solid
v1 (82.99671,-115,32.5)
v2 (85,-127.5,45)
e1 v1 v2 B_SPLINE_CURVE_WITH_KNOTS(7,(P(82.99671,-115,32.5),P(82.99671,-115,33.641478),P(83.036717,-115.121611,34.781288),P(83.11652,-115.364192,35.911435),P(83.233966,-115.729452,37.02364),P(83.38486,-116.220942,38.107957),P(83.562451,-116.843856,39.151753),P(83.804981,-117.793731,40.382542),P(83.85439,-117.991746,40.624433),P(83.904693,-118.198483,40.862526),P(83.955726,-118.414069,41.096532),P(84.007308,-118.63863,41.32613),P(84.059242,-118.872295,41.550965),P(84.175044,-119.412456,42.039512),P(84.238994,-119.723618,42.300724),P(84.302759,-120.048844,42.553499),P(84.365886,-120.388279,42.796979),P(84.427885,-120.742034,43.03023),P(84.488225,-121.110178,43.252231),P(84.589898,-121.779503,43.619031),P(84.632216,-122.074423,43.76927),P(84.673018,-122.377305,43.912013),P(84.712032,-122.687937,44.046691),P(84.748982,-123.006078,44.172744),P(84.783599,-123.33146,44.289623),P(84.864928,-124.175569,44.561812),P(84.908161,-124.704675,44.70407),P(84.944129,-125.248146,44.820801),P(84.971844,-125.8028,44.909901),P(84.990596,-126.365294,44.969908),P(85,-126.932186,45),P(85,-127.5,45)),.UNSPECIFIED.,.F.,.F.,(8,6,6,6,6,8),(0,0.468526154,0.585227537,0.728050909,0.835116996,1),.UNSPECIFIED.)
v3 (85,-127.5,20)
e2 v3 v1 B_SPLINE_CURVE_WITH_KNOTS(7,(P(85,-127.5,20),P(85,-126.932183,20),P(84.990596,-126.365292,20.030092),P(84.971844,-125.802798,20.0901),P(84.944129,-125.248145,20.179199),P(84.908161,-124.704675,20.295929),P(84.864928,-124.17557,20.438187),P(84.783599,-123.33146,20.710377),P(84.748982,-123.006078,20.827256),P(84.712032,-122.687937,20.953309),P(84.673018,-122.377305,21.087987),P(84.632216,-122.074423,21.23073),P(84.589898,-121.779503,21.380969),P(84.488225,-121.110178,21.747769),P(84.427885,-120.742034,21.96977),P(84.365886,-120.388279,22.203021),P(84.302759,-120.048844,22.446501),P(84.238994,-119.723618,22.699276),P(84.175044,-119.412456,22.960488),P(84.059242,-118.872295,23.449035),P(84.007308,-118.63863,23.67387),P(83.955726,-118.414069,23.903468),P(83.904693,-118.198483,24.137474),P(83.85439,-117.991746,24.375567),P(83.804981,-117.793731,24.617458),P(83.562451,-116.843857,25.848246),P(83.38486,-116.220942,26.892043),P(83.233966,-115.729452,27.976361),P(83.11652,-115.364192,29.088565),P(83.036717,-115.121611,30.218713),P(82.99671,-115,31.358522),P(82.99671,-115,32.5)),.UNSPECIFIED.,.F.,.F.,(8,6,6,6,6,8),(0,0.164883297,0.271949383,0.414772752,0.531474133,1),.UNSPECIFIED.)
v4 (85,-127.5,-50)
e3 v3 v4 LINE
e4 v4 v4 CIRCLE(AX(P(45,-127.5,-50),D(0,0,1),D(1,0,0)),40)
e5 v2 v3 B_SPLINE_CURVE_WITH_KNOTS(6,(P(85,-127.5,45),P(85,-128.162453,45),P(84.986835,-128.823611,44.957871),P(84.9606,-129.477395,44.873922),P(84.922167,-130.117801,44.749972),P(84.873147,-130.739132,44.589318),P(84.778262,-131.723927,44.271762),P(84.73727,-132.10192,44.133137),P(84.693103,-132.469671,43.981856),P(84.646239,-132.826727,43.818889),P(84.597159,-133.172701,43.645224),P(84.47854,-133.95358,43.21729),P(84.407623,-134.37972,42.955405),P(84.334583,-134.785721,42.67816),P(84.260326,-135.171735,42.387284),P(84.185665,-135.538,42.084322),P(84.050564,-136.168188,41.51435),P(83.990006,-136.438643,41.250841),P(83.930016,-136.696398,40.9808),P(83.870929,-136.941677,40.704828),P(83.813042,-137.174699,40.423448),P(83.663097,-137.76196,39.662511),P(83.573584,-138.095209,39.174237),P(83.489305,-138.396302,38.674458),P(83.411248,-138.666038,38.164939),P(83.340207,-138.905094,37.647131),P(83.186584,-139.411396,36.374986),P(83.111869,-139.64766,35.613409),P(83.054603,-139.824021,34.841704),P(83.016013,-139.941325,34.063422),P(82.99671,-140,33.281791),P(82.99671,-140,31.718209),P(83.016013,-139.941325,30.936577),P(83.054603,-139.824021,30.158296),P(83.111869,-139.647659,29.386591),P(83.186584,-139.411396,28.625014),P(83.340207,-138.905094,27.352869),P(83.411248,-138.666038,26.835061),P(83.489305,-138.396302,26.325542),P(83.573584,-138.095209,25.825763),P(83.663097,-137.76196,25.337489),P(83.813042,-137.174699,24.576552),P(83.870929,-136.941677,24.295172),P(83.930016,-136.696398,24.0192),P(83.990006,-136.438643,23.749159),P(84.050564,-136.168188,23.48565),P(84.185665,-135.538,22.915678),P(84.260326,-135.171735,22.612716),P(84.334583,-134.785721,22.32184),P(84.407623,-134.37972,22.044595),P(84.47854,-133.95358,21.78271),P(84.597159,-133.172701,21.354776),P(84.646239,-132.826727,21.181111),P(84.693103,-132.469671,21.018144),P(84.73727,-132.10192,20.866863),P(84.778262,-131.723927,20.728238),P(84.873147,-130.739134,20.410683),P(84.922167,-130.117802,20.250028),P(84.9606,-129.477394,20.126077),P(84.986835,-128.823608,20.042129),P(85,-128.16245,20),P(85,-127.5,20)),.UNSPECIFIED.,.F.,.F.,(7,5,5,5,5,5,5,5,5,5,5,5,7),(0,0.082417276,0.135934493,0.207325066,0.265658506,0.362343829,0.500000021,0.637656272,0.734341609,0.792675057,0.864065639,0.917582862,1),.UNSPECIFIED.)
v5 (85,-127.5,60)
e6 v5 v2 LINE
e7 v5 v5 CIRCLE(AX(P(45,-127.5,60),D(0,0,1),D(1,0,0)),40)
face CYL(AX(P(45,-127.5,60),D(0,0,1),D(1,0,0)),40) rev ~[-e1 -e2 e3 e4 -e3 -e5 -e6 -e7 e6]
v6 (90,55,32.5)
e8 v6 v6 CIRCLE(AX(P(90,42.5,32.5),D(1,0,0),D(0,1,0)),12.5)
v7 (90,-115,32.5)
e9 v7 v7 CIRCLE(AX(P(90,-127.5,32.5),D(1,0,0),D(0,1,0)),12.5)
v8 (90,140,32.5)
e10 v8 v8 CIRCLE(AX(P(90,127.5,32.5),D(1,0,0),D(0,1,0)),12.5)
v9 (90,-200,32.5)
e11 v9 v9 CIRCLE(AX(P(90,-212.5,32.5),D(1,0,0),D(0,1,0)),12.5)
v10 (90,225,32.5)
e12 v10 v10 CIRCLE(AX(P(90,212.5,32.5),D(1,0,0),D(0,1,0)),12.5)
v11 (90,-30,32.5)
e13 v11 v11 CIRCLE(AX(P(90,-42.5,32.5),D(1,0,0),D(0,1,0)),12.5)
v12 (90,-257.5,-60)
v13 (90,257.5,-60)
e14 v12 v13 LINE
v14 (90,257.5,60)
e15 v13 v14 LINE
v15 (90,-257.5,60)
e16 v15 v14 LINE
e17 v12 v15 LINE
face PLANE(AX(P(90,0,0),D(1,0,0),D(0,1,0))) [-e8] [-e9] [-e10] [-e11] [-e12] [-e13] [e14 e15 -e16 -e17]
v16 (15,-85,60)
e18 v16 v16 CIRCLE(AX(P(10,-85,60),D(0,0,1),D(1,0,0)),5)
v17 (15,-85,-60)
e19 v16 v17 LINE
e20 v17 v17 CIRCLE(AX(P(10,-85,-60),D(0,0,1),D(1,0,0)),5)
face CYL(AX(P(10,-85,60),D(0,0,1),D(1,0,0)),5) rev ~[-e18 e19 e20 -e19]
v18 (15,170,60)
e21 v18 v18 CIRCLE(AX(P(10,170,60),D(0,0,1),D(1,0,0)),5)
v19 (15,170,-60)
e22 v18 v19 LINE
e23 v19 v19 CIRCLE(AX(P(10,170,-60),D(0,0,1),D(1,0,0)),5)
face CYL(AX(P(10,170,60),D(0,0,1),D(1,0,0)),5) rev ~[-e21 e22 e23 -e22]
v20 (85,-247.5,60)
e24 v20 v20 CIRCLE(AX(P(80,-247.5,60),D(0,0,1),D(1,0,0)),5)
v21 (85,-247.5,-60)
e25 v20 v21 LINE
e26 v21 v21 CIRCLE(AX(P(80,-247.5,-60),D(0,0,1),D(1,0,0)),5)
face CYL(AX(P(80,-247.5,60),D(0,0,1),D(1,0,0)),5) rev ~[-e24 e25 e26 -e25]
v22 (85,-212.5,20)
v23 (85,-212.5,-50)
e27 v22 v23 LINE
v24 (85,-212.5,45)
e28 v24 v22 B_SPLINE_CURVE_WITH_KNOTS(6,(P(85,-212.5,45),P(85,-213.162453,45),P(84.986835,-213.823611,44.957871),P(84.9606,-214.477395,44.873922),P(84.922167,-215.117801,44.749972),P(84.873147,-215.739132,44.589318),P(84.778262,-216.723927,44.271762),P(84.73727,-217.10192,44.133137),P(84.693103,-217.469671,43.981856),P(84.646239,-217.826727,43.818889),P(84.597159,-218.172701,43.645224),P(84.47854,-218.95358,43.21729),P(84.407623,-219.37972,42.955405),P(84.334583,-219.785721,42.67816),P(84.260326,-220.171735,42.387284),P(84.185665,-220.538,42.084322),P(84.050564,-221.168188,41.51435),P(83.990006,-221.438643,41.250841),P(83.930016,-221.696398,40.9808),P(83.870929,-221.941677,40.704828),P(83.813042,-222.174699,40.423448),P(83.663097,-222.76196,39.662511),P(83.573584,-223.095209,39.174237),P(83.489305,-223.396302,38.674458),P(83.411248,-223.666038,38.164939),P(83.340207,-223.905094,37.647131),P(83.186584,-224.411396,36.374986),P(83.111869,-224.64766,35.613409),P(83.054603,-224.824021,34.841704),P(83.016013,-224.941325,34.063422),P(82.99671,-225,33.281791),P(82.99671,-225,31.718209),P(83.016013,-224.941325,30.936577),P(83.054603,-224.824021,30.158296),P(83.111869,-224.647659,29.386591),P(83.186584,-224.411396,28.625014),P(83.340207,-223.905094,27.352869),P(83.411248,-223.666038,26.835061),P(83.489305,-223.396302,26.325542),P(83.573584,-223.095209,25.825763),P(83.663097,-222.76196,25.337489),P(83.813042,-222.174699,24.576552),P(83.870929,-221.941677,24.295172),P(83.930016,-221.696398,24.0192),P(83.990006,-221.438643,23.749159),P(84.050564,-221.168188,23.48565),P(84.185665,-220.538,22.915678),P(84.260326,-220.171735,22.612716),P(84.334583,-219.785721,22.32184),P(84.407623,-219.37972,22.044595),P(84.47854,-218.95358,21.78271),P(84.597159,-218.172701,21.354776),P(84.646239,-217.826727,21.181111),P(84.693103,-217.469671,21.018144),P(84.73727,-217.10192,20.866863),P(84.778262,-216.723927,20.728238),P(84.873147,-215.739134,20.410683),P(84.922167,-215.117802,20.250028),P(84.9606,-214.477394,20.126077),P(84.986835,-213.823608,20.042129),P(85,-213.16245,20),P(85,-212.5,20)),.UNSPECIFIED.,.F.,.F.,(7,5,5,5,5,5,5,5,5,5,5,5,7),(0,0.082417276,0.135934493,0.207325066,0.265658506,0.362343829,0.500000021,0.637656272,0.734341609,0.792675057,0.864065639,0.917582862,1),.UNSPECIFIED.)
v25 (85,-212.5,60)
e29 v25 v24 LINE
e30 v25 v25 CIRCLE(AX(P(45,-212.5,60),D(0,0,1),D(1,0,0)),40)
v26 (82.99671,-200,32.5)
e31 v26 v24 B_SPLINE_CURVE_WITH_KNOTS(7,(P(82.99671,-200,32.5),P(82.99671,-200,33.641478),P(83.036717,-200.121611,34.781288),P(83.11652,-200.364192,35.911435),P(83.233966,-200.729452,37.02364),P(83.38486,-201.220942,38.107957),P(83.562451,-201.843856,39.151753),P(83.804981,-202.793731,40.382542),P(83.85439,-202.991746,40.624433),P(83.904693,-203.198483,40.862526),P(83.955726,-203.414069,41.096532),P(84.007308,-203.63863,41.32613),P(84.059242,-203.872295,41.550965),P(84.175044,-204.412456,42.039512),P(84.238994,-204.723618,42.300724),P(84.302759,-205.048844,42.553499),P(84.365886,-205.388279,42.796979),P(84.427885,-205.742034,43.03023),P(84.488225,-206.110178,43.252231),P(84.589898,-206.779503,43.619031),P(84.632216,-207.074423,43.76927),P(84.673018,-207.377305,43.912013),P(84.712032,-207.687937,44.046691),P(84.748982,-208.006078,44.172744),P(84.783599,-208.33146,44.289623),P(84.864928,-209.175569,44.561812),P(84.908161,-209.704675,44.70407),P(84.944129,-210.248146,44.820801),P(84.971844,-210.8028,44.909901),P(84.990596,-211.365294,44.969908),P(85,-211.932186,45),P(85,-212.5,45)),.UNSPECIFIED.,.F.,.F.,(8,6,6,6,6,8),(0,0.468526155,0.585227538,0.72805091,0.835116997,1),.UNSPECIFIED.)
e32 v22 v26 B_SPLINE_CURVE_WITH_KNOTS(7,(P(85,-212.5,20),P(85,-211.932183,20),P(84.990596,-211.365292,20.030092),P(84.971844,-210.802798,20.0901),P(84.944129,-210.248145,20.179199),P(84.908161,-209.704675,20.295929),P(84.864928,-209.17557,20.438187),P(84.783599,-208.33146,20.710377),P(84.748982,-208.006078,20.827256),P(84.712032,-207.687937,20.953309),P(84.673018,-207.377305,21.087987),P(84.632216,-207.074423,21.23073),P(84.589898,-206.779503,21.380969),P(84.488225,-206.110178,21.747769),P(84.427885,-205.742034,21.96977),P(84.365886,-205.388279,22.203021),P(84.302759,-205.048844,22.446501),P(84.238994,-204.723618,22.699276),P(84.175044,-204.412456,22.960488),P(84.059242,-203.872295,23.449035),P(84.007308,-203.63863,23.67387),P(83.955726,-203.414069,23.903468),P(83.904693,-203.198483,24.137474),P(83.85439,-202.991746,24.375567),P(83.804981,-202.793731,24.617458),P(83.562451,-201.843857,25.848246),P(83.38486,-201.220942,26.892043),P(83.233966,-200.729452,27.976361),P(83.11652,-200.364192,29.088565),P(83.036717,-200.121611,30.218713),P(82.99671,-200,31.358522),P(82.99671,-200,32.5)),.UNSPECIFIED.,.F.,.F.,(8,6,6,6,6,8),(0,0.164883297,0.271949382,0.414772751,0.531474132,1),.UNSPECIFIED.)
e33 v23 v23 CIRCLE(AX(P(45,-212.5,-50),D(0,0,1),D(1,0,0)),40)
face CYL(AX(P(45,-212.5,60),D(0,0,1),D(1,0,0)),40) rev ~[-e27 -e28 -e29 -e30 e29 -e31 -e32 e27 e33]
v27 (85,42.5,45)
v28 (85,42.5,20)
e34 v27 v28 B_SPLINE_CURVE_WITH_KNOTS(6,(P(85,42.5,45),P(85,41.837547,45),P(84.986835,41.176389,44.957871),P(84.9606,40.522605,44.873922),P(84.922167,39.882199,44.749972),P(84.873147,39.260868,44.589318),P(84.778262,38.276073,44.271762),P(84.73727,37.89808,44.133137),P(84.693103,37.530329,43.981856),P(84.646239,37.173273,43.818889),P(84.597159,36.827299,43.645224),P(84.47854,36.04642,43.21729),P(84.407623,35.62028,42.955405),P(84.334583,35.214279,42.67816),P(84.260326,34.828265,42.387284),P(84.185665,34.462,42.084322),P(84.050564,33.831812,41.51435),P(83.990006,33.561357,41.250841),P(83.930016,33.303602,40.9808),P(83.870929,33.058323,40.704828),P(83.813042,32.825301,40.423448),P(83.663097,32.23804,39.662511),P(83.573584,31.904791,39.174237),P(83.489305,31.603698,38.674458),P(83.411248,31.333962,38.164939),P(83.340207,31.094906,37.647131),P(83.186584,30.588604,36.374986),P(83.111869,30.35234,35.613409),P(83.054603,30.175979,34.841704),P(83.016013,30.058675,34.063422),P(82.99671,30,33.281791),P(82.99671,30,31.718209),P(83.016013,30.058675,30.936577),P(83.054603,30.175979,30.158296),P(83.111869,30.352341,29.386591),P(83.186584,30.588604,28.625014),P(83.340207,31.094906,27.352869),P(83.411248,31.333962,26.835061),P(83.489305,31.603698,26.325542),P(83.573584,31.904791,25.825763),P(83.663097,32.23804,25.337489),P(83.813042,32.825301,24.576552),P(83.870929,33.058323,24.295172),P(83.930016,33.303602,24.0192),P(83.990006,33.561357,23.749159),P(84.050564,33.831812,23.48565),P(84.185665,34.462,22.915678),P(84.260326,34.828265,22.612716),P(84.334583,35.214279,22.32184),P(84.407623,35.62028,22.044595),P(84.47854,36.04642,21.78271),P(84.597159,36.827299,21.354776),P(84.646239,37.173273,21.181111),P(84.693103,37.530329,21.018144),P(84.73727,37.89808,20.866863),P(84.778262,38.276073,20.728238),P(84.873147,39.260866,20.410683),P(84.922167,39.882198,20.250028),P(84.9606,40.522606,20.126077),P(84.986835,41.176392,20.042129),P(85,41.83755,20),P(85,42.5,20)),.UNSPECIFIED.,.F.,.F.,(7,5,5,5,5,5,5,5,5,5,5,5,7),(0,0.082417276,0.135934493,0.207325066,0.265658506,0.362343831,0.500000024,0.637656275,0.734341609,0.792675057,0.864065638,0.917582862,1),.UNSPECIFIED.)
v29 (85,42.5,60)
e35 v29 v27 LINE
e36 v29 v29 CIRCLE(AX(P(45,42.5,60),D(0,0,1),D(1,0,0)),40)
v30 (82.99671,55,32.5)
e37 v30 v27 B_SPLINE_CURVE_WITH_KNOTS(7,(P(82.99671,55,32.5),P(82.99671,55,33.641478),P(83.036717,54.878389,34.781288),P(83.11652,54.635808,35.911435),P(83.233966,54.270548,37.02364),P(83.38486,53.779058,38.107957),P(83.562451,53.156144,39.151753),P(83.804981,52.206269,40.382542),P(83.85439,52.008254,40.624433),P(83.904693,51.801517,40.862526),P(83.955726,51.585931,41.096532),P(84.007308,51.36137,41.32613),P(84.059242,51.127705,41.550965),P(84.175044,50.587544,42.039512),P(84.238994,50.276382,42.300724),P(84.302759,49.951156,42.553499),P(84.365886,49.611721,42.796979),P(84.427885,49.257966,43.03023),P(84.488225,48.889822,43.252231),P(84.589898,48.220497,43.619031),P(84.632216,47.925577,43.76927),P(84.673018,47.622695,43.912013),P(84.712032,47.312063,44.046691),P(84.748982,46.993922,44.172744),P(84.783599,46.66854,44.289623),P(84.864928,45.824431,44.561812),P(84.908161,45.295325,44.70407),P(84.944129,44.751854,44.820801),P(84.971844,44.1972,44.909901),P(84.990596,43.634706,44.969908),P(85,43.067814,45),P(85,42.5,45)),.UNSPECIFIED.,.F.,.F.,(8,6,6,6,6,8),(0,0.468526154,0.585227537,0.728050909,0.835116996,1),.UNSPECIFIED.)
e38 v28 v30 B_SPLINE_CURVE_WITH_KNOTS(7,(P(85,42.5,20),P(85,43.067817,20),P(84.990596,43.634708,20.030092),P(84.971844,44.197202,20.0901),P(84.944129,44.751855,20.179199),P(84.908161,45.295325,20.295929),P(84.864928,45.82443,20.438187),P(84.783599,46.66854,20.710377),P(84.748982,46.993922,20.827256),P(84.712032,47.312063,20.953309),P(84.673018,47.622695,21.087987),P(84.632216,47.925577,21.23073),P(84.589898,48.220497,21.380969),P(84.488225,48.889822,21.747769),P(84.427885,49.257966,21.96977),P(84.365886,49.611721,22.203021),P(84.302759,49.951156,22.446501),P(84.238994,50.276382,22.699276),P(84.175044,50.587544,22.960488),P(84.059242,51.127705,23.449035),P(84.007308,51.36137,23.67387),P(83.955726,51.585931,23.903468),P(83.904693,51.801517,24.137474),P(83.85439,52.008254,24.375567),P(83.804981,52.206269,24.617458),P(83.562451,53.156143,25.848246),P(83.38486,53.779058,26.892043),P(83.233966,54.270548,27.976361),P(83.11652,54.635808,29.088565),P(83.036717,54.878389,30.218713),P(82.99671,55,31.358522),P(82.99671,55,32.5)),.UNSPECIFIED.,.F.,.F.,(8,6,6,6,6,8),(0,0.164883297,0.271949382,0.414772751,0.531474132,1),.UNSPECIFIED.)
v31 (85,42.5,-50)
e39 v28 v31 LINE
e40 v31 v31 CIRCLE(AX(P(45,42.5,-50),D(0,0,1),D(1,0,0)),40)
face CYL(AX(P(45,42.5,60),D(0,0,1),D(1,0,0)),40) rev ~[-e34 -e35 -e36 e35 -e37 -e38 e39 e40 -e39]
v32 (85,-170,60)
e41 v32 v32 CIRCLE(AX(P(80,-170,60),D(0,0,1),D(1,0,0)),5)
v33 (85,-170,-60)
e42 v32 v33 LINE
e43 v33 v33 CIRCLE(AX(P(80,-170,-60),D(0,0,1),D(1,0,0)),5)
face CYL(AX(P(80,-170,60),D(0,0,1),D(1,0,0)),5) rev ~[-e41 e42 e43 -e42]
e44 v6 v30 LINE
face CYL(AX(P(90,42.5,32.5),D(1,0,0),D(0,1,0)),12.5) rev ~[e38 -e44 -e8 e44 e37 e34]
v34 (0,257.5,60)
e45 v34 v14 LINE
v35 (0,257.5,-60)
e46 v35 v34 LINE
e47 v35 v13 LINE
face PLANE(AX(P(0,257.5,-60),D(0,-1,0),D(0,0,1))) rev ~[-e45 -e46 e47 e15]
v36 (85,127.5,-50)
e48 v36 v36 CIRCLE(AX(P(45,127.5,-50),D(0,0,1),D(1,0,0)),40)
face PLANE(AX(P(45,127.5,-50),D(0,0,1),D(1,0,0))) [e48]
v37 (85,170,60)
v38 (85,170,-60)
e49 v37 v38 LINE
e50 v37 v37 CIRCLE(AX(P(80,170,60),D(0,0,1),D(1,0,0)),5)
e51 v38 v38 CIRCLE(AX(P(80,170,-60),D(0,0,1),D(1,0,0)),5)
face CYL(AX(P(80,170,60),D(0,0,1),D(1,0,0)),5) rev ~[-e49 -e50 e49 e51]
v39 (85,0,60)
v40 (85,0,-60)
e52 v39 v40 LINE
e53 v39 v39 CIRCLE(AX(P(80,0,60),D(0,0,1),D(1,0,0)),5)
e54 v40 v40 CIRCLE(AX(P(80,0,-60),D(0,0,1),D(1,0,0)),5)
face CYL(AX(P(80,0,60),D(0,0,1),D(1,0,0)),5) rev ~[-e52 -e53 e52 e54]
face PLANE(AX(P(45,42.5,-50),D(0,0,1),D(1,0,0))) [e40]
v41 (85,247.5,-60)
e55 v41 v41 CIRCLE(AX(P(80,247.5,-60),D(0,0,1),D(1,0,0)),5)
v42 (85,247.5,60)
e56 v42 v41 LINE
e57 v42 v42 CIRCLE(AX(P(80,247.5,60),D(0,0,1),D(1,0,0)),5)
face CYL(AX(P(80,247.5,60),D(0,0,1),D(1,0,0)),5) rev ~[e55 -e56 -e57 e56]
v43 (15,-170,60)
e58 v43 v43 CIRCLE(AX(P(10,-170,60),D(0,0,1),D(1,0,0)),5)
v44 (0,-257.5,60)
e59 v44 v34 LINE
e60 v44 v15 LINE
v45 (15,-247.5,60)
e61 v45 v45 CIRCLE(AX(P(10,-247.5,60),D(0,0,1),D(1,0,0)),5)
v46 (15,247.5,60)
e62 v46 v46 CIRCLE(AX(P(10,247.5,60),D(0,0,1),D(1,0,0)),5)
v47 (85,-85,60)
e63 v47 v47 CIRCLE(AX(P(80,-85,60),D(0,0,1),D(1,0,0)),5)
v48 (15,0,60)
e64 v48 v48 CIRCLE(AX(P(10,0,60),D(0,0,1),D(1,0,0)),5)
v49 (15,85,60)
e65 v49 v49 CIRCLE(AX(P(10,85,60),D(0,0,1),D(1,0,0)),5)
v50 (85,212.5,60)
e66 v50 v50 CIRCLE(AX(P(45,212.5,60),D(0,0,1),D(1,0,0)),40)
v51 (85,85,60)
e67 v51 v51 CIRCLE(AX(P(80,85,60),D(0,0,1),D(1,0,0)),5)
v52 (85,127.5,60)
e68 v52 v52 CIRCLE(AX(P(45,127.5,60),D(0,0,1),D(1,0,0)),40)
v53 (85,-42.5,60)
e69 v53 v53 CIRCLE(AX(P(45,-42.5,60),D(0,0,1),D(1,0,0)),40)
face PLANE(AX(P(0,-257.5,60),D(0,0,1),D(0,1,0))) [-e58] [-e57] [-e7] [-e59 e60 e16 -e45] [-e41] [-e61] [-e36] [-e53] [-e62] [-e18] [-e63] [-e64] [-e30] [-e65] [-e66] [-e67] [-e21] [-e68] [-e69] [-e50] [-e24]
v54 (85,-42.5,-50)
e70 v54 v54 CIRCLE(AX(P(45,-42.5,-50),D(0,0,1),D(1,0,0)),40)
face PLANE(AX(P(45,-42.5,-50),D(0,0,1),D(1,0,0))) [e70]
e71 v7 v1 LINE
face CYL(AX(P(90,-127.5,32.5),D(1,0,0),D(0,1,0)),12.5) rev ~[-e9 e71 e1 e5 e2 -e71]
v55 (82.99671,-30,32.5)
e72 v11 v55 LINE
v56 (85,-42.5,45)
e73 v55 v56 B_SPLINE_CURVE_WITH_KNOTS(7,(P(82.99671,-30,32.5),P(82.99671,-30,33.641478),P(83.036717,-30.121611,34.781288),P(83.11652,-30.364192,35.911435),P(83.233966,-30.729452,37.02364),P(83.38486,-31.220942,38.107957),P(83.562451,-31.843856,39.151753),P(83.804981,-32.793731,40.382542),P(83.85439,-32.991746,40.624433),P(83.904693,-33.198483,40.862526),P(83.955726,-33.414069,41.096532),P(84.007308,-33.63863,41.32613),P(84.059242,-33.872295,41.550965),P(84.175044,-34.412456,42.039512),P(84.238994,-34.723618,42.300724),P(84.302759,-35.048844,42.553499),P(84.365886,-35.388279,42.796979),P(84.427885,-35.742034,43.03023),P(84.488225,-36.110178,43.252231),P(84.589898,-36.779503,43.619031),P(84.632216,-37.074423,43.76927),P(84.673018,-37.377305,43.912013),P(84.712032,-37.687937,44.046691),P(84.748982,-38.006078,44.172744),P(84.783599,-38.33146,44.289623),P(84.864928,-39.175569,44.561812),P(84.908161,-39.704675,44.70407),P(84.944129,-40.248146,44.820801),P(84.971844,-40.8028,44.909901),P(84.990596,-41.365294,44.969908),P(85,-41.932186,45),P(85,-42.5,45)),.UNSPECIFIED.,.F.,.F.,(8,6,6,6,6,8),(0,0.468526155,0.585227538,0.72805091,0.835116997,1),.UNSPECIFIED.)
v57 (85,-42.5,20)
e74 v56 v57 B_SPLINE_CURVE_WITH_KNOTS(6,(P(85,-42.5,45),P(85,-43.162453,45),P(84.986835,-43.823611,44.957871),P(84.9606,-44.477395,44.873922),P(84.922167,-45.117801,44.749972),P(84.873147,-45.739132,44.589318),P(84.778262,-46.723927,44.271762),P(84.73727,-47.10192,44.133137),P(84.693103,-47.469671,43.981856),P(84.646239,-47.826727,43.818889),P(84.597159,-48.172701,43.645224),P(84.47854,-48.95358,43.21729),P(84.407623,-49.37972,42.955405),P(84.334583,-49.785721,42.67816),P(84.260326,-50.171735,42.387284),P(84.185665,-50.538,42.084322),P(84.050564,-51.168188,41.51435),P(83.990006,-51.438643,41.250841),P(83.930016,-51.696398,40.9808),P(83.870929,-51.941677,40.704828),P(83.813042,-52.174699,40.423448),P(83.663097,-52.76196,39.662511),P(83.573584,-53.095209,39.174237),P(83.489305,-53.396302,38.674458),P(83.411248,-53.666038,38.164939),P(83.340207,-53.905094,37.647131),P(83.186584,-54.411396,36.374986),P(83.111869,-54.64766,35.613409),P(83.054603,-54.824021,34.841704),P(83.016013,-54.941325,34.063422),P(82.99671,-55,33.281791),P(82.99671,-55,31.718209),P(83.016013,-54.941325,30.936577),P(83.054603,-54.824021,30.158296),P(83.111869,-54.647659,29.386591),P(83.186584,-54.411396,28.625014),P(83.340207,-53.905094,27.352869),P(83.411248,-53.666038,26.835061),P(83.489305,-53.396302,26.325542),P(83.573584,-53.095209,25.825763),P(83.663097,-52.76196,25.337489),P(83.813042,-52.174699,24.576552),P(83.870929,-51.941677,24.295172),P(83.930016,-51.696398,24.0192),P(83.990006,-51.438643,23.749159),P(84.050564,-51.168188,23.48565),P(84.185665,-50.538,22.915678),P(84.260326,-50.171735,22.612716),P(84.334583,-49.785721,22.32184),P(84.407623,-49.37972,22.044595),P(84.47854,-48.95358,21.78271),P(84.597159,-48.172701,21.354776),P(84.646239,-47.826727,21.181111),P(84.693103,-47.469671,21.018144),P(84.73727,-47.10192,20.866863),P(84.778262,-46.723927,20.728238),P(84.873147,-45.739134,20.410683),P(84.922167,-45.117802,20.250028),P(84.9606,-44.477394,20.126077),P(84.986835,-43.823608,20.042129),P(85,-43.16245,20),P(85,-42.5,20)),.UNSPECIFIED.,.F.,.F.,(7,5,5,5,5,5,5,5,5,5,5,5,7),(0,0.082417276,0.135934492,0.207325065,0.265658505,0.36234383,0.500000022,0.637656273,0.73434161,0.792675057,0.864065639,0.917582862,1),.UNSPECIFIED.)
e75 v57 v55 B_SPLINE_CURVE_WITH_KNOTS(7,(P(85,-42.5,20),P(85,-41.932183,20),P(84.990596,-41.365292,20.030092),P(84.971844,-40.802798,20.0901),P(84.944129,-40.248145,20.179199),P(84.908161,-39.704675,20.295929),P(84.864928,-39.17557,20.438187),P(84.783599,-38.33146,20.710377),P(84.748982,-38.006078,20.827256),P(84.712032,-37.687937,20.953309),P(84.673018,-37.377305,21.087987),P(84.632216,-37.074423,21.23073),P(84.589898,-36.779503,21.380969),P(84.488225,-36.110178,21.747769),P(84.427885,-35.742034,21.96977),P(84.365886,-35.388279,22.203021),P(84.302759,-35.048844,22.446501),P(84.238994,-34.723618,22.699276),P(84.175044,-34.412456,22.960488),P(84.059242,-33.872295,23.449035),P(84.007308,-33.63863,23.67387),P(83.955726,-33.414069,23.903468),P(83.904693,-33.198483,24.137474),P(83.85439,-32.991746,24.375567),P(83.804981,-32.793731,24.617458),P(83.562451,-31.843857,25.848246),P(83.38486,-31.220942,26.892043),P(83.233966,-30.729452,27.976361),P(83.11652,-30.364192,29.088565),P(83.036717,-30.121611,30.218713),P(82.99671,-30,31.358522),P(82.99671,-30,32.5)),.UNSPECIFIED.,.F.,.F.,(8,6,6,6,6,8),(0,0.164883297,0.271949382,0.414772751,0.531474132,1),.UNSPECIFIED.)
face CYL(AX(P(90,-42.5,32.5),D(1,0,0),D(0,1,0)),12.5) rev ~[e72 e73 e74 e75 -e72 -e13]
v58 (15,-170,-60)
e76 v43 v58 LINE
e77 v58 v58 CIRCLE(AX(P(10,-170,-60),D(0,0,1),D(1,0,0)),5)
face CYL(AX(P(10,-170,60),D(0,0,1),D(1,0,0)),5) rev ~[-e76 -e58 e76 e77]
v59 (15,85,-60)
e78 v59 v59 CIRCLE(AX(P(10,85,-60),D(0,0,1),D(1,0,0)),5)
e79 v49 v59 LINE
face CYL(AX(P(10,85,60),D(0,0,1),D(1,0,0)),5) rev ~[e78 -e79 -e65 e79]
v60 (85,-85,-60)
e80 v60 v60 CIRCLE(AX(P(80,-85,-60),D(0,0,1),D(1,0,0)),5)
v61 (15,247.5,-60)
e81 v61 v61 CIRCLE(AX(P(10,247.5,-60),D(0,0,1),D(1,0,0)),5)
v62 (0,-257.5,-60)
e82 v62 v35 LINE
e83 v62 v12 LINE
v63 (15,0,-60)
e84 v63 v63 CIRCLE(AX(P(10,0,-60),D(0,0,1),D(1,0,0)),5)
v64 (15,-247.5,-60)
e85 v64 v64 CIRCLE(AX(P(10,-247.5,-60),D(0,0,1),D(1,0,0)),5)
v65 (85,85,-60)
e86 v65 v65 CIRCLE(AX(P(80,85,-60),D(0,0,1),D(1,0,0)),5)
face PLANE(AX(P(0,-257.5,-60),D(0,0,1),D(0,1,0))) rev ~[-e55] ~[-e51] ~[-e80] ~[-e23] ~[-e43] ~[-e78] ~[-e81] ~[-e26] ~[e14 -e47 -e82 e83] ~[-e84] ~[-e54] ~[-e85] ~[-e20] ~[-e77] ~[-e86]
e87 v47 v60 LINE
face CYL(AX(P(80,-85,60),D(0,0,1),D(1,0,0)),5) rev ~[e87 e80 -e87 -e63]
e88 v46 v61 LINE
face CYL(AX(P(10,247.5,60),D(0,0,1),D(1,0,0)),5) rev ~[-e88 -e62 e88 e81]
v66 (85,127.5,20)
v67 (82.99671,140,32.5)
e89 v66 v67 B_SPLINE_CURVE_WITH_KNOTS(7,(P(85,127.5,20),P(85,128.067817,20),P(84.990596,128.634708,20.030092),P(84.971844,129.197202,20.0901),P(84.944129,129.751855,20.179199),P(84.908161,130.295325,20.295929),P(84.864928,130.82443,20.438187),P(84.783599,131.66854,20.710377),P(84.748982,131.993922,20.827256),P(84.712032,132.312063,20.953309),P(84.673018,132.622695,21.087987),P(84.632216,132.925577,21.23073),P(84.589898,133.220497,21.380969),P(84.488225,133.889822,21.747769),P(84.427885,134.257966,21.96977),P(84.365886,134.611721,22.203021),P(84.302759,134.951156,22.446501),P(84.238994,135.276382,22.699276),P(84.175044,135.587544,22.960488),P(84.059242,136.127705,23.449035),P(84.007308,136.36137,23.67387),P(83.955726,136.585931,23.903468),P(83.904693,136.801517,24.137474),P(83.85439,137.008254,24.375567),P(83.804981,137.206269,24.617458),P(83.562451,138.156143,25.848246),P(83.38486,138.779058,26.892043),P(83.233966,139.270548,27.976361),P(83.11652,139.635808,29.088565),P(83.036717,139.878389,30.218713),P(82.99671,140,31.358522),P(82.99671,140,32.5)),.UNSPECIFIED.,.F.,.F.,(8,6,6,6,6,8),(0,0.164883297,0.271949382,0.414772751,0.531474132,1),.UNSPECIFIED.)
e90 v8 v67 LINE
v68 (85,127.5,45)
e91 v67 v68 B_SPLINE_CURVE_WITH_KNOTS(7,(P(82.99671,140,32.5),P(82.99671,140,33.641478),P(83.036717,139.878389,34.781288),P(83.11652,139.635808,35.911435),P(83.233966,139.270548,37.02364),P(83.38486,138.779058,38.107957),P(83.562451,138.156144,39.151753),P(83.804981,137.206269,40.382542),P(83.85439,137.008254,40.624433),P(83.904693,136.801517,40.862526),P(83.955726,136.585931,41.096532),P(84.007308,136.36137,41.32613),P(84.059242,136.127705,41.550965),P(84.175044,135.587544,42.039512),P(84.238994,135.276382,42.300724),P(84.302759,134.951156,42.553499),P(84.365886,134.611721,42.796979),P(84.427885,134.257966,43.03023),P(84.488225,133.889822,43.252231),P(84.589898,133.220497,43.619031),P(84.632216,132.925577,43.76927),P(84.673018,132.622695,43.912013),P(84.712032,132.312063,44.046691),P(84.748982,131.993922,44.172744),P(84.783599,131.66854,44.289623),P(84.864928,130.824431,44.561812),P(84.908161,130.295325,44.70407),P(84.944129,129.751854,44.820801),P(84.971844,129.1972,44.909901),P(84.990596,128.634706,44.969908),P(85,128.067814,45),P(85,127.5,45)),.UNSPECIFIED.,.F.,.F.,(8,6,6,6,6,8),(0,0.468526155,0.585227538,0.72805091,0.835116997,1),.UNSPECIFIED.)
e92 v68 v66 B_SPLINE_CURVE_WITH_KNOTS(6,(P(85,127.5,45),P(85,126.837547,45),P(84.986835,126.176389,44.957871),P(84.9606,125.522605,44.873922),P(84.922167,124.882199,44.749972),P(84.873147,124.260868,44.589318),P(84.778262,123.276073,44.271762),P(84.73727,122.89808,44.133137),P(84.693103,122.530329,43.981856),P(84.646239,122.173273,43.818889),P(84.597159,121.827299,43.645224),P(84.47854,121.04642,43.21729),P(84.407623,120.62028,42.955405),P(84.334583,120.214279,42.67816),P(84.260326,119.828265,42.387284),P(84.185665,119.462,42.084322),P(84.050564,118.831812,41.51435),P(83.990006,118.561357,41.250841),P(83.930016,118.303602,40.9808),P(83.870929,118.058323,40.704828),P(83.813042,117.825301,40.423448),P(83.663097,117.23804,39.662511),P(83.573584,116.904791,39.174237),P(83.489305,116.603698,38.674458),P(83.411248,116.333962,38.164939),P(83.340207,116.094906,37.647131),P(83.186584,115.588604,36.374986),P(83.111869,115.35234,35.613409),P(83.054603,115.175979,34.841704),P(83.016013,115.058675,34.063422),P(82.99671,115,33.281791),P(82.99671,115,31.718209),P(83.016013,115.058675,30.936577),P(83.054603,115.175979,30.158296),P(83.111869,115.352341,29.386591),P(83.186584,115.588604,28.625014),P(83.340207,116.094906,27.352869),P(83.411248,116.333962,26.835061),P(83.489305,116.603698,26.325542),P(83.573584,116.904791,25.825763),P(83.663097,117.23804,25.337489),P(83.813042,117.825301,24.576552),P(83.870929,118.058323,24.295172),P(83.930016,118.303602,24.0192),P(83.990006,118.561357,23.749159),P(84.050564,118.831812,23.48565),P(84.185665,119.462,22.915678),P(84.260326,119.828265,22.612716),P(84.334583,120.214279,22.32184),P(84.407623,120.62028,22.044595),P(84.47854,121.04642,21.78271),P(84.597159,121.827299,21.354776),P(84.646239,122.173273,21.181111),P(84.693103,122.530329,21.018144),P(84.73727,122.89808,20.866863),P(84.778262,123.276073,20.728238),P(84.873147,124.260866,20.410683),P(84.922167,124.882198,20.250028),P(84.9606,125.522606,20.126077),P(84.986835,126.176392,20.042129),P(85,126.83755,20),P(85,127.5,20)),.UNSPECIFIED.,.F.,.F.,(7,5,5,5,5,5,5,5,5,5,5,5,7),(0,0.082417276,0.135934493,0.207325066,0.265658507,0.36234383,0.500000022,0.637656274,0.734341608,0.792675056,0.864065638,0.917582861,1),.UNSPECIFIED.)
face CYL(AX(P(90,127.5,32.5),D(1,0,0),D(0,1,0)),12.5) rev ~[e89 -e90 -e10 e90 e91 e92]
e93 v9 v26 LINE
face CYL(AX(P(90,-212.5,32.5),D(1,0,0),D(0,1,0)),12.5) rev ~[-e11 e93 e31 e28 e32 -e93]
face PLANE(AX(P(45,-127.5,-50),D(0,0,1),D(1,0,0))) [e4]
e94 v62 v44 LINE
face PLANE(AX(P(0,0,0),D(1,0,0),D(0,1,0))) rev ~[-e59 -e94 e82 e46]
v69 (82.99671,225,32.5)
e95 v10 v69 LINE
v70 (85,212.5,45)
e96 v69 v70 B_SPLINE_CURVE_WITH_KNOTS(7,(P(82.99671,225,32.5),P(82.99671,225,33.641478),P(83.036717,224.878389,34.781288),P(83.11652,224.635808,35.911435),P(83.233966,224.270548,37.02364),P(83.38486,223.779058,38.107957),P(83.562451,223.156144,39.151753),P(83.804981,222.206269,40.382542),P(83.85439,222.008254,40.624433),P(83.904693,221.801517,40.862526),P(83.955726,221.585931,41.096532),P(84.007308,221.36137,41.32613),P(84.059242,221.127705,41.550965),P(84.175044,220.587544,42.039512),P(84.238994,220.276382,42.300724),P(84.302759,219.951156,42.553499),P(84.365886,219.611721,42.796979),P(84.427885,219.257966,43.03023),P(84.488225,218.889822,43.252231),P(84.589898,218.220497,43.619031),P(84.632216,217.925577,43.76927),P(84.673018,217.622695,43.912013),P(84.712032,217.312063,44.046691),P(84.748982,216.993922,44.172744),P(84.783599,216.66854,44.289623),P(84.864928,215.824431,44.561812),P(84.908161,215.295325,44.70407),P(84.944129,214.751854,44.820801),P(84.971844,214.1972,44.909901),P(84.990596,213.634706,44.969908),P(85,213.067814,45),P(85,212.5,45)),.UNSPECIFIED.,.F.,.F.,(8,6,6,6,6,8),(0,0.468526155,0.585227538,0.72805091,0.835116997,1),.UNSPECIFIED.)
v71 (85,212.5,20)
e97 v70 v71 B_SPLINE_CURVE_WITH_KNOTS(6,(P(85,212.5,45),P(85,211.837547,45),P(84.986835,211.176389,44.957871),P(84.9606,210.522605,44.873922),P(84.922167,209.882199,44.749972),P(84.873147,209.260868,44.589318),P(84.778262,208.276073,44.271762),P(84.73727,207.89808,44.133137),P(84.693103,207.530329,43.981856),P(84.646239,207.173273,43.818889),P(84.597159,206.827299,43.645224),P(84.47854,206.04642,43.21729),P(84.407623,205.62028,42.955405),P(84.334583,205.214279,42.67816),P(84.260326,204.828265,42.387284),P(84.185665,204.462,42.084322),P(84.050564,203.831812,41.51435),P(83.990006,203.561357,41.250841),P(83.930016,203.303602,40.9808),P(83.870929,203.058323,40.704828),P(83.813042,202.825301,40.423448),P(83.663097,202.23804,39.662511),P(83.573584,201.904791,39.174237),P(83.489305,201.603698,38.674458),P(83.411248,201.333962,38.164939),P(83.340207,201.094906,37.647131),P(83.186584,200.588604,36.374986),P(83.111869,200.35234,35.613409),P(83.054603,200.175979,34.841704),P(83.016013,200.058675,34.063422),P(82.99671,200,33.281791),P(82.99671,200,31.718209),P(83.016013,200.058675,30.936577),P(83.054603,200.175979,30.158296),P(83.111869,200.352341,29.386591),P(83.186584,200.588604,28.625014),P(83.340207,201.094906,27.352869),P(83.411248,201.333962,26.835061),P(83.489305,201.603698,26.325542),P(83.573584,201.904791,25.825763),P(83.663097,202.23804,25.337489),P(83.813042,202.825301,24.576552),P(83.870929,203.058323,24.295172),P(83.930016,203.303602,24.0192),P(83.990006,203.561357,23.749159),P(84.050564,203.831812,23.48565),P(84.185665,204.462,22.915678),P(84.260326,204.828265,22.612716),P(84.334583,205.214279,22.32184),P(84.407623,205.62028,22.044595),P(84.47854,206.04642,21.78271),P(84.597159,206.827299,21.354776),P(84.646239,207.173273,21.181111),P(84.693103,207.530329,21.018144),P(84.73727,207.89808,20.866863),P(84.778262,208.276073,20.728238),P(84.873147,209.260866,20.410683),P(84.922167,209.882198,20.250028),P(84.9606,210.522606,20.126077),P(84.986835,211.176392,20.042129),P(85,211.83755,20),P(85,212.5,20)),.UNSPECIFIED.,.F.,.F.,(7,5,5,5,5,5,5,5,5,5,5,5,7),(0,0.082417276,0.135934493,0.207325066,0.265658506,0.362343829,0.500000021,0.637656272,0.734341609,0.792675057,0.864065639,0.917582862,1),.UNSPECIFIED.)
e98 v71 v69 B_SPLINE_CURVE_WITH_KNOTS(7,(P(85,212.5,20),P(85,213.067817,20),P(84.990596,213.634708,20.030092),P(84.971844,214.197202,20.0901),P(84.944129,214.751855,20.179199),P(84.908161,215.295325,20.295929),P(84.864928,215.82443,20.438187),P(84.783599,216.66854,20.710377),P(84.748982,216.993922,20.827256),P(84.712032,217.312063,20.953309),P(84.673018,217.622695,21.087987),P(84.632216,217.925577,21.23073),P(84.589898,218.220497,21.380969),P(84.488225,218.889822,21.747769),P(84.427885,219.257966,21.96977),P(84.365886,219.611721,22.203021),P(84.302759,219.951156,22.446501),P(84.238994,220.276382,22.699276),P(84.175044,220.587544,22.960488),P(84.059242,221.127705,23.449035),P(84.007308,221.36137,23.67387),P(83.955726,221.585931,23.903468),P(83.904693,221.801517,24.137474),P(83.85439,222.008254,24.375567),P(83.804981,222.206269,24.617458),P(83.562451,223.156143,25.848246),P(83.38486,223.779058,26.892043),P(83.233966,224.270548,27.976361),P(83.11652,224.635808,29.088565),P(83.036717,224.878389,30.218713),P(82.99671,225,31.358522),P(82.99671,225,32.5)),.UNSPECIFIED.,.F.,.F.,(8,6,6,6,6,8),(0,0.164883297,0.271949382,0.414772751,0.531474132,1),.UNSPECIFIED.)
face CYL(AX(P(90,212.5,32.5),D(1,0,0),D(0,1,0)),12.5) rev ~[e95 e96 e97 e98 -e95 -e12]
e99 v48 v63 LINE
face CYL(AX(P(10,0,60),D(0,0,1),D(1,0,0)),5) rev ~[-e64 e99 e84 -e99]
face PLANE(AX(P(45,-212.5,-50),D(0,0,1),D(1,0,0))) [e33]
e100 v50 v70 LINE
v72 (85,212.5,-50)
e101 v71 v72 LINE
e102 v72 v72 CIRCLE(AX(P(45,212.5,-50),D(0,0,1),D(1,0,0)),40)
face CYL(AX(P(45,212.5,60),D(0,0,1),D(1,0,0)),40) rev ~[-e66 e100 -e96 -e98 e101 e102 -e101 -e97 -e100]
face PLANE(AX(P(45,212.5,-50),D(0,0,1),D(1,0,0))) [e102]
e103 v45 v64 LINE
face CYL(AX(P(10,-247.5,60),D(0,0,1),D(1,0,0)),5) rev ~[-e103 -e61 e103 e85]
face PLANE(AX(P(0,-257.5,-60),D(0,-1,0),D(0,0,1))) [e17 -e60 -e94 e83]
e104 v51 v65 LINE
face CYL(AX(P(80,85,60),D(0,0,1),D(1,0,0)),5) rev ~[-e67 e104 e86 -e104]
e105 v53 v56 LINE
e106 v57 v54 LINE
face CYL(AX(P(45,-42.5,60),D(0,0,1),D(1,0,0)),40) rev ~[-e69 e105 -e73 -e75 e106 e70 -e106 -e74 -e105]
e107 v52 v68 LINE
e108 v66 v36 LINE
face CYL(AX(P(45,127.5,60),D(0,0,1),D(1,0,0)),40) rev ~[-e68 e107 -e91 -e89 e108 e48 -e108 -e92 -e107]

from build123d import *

# Parameters (mm, degrees)
F0_W     = 515
F0_H     = 120
F1_DEPTH = 90
F2_R     = 40
F3_DEPTH = 110
F4_R     = 12.5
F5_DEPTH = 25
F6_R     = 5
F7_DEPTH = 120
F8_DEPTH = 120


# Not quite as in the source:
# - a feature names something its author has since deleted; it is built from what else it names


with BuildPart() as f1:
    # F0 (on Right) → F1 (new body)
    with BuildSketch(Plane.YZ):
        Rectangle(F0_W, F0_H)
    extrude(amount=F1_DEPTH)

    # F2 (on face) → F3 (cut)
    with BuildSketch(Plane.XY.offset(60)):
        with Locations((45, 212.5)):
            Circle(F2_R)
        with Locations((45, 127.5)):
            Circle(F2_R)
        with Locations((45, 42.5)):
            Circle(F2_R)
        with Locations((45, -42.5)):
            Circle(F2_R)
        with Locations((45, -127.5)):
            Circle(F2_R)
        with Locations((45, -212.5)):
            Circle(F2_R)
    extrude(amount=-F3_DEPTH, mode=Mode.SUBTRACT)

    # F4 (on face) → F5 (cut)
    with BuildSketch(Plane.YZ.offset(90)):
        with Locations((-127.5, 32.5)):
            Circle(F4_R)
        with Locations((-212.5, 32.5)):
            Circle(F4_R)
        with Locations((-42.5, 32.5)):
            Circle(F4_R)
        with Locations((42.5, 32.5)):
            Circle(F4_R)
        with Locations((127.5, 32.5)):
            Circle(F4_R)
        with Locations((212.5, 32.5)):
            Circle(F4_R)
    extrude(amount=-F5_DEPTH, mode=Mode.SUBTRACT)

    # F6 (on face) → F7 (cut)
    with BuildSketch(Plane.XY.offset(60)):
        with Locations((80, 170)):
            Circle(F6_R)
        with Locations((80, 247.5)):
            Circle(F6_R)
        with Locations((80, 85)):
            Circle(F6_R)
        with Locations((10, 85)):
            Circle(F6_R)
        with Locations((10, 170)):
            Circle(F6_R)
        with Locations((10, 247.5)):
            Circle(F6_R)
        with Locations((80, 0)):
            Circle(F6_R)
        with Locations((80, -85)):
            Circle(F6_R)
        with Locations((10, -85)):
            Circle(F6_R)
        with Locations((10, -170)):
            Circle(F6_R)
        with Locations((80, -170)):
            Circle(F6_R)
        with Locations((80, -247.5)):
            Circle(F6_R)
        with Locations((10, -247.5)):
            Circle(F6_R)
    extrude(amount=-F7_DEPTH, mode=Mode.SUBTRACT)

    # F6 (on face) → F8 (cut)
    with BuildSketch(Plane.XY.offset(60)):
        with Locations((10, 0)):
            Circle(F6_R)
    extrude(amount=-F8_DEPTH, mode=Mode.SUBTRACT)


solid = f1.part
